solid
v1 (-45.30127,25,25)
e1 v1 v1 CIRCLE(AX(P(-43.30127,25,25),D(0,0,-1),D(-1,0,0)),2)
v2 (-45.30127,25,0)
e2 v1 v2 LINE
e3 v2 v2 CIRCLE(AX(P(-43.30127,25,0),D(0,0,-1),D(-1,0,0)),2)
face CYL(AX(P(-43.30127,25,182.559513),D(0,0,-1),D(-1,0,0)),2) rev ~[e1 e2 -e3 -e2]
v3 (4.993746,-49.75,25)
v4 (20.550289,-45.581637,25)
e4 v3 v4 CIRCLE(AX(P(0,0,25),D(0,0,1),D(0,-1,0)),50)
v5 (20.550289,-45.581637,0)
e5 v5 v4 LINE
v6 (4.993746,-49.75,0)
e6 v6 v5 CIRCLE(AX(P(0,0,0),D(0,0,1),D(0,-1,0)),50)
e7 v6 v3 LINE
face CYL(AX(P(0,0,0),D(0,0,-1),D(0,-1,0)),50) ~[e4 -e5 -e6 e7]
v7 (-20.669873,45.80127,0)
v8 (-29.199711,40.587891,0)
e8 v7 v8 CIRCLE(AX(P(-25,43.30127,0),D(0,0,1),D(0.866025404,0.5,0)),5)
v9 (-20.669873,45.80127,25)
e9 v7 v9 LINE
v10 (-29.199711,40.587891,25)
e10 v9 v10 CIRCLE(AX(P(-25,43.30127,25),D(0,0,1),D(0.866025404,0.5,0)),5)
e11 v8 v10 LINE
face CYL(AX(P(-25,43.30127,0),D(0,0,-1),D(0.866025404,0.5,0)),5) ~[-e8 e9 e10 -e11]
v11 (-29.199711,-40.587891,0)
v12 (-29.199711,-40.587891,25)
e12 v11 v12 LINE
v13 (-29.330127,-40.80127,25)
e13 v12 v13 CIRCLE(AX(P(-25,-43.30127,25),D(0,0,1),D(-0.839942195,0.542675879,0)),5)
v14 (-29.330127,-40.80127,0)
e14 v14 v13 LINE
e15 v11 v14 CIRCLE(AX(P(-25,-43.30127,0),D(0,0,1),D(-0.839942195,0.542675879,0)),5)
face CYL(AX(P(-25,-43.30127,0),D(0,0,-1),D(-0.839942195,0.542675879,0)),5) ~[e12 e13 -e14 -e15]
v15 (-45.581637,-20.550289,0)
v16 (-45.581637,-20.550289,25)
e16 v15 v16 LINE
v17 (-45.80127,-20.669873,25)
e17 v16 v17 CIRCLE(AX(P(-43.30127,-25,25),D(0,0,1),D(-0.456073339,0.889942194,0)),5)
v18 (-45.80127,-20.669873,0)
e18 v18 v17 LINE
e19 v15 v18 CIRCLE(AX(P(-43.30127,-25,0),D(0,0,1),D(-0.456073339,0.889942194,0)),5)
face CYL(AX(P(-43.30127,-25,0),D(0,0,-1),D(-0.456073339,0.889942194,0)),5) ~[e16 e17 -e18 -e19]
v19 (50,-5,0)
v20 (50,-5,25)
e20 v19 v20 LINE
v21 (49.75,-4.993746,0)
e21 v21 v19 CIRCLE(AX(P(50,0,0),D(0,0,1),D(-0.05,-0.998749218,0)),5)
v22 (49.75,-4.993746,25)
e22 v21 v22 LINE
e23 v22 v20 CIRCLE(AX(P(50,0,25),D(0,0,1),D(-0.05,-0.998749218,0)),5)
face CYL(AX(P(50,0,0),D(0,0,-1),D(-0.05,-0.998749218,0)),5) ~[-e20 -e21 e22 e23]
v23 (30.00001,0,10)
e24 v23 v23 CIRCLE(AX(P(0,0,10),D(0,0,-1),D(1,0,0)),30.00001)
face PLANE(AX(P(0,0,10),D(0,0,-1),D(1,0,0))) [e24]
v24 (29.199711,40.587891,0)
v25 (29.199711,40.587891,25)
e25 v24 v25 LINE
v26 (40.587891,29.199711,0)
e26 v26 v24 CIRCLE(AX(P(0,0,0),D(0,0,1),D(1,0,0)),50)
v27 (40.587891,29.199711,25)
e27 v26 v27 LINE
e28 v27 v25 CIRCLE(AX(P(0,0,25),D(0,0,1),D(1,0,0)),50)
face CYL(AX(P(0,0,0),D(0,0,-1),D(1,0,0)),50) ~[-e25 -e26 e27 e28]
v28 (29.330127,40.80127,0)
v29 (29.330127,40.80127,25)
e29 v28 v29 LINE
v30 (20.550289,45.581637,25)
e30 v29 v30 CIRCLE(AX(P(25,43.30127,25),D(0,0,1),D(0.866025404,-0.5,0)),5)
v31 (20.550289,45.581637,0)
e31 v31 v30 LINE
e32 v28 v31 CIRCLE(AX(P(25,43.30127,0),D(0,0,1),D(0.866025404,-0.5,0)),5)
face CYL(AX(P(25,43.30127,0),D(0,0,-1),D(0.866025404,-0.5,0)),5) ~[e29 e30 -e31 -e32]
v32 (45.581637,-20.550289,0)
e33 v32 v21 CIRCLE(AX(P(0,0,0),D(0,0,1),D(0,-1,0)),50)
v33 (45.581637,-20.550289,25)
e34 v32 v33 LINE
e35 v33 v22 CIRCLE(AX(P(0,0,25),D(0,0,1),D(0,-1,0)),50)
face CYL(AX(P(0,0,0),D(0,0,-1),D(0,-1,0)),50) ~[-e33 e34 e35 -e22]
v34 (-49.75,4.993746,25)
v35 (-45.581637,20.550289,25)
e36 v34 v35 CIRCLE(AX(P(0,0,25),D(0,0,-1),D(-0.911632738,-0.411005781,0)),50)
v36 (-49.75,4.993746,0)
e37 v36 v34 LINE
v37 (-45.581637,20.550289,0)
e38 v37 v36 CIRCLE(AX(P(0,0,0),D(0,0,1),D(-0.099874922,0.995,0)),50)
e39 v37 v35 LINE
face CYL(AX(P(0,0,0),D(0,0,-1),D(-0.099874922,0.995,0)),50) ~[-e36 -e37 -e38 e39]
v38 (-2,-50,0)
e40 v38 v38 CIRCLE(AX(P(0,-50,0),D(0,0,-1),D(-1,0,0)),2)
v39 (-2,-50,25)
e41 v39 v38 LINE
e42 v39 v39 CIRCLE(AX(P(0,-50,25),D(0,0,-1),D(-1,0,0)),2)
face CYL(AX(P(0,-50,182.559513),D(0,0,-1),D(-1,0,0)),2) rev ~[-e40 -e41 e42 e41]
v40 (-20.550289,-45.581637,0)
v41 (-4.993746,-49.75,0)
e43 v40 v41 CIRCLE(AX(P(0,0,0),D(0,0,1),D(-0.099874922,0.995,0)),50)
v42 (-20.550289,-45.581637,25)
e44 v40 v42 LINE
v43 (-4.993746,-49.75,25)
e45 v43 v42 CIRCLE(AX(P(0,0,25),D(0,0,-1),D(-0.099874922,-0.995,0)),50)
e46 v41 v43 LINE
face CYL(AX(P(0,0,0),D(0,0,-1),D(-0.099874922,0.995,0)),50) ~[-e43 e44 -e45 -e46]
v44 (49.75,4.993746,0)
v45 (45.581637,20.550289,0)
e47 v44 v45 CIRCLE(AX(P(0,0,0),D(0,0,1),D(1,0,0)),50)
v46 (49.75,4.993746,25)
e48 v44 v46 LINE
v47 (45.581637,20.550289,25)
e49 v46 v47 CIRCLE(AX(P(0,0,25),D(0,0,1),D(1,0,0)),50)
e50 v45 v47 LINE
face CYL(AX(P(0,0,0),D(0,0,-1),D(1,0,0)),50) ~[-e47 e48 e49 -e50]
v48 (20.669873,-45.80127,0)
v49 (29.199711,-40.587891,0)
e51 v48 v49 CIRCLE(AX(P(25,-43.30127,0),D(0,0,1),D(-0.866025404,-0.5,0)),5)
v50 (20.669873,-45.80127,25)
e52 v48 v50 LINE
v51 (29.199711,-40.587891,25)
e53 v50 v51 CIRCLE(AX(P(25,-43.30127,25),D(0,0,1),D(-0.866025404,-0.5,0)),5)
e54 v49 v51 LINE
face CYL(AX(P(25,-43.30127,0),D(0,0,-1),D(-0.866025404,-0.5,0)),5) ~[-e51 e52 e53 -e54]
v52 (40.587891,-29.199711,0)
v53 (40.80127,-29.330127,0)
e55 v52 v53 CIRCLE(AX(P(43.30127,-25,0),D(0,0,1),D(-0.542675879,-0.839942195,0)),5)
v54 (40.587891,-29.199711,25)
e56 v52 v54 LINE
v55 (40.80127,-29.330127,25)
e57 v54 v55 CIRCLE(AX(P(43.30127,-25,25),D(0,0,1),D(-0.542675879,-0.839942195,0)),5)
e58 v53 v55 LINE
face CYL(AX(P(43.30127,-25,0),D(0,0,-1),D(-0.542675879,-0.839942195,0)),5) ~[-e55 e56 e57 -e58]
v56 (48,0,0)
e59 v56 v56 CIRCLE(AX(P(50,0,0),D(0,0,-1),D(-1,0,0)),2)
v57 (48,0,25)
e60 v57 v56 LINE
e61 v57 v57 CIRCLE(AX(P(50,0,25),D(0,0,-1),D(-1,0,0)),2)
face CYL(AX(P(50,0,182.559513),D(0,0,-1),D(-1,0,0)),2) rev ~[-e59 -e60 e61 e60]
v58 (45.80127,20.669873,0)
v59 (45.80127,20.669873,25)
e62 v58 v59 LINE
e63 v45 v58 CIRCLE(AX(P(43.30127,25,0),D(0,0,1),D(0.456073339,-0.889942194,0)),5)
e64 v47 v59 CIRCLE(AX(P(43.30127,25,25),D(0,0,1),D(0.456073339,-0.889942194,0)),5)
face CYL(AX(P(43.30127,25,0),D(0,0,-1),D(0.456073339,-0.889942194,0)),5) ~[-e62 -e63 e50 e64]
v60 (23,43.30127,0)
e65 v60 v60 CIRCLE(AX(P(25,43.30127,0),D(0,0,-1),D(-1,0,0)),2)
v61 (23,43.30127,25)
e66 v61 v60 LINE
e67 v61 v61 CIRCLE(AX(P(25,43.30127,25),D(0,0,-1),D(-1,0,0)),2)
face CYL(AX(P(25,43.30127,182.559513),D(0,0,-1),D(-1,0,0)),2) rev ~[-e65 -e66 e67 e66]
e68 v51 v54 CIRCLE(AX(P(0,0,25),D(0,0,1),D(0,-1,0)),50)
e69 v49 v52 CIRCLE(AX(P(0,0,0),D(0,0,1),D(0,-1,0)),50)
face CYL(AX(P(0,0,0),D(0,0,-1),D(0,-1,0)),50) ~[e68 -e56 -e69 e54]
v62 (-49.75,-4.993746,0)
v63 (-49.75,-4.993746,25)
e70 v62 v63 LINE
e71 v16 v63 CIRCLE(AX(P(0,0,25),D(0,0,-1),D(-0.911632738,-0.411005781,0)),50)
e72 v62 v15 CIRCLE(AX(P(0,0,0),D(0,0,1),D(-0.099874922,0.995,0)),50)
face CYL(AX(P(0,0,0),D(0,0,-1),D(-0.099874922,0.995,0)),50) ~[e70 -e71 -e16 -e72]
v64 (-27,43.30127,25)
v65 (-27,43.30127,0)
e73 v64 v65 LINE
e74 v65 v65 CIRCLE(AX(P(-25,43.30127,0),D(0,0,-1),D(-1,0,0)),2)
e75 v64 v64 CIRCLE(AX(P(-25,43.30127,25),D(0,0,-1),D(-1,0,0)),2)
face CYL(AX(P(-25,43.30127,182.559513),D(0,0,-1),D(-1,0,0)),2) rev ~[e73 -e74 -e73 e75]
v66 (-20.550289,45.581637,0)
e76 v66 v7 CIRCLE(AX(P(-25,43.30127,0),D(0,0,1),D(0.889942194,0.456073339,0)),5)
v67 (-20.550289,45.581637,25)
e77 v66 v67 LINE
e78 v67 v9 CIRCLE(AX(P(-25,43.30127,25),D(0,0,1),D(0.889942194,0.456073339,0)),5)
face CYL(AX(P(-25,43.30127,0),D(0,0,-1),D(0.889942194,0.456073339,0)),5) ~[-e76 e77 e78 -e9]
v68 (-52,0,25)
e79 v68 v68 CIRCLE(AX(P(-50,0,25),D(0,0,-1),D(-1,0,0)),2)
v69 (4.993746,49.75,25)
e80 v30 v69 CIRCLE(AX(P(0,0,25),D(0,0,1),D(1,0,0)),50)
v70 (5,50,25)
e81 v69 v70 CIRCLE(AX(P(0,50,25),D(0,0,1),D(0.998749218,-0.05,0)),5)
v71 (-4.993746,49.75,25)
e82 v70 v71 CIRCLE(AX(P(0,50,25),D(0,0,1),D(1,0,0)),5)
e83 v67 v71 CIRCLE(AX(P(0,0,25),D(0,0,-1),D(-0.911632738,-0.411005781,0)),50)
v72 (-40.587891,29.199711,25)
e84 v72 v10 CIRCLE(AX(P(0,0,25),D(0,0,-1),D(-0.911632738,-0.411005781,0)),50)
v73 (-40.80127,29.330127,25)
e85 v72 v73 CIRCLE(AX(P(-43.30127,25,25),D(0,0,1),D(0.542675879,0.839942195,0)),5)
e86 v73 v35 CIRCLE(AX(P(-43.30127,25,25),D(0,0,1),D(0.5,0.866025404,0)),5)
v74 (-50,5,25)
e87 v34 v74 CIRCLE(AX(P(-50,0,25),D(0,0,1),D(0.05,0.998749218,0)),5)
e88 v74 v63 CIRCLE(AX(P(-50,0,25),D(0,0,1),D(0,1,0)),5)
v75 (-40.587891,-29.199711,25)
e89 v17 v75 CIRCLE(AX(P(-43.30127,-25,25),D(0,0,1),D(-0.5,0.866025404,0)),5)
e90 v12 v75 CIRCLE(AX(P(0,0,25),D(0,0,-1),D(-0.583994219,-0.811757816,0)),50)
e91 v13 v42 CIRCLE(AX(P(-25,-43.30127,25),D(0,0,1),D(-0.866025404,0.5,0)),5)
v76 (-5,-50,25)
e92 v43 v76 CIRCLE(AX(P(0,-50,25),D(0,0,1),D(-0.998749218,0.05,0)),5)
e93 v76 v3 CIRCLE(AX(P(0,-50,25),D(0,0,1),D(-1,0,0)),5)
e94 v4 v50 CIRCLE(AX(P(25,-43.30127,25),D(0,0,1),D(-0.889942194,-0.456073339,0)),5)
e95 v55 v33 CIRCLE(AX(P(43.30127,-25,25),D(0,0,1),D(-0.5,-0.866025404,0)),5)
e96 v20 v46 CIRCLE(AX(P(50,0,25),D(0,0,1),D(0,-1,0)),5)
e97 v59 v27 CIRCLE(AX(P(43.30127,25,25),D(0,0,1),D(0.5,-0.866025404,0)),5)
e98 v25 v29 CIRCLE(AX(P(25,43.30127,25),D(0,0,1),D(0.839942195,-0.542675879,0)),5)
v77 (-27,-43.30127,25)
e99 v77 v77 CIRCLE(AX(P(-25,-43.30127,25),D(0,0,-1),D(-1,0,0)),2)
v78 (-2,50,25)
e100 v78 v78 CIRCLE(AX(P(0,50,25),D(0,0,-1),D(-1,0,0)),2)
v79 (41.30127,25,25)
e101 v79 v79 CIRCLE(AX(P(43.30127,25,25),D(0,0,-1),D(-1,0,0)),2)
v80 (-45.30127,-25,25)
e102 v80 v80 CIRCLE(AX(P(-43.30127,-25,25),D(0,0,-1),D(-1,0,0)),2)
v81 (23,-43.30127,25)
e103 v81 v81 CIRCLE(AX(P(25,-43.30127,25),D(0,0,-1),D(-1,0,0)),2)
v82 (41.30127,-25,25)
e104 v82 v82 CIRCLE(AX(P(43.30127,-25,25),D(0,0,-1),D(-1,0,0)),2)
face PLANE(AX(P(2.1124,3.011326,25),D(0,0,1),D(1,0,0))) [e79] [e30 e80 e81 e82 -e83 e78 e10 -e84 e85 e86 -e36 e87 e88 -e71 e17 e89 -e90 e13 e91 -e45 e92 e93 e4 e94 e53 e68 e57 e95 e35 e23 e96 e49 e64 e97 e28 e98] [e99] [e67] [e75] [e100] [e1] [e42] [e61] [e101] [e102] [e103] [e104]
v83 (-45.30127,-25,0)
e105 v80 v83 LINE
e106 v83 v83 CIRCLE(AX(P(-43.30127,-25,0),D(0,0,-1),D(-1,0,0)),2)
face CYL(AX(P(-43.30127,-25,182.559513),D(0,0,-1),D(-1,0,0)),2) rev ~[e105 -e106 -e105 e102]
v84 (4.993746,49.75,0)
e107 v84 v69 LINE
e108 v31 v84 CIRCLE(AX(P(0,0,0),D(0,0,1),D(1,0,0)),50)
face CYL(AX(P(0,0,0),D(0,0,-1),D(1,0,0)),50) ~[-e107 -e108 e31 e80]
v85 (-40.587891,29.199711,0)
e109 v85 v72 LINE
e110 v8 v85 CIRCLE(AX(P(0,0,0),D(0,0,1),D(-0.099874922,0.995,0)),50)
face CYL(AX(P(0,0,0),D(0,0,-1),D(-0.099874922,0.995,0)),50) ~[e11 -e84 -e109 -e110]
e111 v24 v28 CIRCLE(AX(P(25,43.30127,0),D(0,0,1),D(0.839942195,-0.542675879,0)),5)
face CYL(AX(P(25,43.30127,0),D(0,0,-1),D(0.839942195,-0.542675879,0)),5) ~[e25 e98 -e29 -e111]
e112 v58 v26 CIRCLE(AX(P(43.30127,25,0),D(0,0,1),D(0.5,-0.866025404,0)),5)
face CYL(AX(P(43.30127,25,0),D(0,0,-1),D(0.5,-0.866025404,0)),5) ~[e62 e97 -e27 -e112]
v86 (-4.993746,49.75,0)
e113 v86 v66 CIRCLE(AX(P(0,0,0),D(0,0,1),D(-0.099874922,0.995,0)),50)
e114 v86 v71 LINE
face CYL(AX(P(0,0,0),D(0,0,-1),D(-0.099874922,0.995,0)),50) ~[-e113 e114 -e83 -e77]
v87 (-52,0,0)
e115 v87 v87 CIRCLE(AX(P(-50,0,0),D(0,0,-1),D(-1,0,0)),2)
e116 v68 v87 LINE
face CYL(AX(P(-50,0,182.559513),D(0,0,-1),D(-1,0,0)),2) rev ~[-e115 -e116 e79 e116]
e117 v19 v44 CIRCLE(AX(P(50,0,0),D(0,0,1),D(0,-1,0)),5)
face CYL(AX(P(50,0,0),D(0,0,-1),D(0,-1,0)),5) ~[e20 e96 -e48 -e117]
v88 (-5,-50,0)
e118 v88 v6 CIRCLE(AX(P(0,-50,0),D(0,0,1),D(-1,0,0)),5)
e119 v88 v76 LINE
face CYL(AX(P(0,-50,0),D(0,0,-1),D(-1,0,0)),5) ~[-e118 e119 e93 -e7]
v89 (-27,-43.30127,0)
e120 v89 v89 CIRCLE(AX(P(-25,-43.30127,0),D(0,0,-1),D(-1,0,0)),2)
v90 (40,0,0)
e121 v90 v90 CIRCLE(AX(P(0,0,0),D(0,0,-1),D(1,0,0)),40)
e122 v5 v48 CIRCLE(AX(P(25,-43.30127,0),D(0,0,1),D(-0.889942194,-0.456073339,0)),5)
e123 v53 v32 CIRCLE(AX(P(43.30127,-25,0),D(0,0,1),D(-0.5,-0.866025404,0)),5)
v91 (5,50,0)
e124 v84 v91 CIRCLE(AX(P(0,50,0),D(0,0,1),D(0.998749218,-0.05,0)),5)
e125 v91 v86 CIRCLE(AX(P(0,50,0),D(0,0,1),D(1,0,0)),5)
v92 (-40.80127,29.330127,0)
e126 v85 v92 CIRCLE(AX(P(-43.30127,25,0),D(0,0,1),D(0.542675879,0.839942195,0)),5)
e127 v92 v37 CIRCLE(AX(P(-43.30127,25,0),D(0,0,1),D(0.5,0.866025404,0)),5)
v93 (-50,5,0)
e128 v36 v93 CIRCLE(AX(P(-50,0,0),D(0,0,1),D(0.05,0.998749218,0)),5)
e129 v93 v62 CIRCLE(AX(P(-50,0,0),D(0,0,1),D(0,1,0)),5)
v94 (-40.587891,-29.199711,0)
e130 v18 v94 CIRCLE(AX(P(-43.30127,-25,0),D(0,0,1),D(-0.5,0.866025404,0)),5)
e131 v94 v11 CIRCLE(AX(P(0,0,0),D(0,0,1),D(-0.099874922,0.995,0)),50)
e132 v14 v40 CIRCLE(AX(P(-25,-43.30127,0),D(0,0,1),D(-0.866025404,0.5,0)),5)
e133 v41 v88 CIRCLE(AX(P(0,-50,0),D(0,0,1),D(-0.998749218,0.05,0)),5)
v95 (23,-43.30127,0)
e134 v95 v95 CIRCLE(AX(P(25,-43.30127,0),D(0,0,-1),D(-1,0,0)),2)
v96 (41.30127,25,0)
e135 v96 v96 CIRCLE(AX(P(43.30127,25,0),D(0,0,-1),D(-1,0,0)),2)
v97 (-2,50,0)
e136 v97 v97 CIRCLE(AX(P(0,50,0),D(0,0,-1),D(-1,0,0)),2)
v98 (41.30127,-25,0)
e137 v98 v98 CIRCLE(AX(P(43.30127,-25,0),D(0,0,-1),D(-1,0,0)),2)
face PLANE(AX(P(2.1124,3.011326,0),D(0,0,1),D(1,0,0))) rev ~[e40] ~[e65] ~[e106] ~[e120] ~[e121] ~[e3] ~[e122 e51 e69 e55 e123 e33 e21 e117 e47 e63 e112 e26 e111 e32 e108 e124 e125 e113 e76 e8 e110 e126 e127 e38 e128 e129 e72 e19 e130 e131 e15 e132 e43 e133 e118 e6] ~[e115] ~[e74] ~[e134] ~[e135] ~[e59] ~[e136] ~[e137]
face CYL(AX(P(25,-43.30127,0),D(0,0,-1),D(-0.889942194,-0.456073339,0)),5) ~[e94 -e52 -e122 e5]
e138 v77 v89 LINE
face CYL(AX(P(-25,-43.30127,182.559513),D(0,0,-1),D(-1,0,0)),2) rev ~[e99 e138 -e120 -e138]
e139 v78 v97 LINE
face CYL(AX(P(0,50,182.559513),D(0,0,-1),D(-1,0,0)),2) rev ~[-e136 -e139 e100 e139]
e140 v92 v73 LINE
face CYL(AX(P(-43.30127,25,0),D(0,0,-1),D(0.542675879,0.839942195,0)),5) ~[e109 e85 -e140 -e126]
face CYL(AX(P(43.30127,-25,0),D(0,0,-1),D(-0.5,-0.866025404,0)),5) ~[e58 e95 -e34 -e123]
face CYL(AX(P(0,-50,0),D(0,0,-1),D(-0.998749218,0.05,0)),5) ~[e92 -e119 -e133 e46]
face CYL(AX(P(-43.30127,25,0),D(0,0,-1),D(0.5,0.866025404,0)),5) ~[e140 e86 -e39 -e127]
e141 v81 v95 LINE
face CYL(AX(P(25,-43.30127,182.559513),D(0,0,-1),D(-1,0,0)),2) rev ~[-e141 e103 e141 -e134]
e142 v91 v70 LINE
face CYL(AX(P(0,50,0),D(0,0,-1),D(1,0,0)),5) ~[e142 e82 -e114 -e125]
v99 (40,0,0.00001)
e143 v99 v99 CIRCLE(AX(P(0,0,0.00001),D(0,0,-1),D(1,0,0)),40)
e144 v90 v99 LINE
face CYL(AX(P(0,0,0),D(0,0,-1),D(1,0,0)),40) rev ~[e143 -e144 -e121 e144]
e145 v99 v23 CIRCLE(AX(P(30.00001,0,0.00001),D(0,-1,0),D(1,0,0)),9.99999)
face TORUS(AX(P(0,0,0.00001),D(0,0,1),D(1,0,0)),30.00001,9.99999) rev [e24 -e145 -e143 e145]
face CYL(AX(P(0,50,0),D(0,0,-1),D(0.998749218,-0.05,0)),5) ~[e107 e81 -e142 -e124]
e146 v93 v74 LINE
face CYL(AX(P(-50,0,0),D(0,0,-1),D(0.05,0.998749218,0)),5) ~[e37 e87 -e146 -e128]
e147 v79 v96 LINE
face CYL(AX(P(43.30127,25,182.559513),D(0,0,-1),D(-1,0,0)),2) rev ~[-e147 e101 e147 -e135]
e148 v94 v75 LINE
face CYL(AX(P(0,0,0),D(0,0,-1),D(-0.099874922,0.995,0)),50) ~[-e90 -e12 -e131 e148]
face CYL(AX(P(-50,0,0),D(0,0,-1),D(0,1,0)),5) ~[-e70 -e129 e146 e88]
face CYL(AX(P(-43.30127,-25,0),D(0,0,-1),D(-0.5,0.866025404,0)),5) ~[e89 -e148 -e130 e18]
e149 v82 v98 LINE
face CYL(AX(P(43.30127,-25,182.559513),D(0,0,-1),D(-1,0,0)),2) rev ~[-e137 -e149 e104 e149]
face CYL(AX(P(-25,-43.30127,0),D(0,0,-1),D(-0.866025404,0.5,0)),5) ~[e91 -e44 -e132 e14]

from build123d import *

# Parameters (mm, degrees)
F1_DEPTH = 25
F2_COUNT = 12
F3_R     = 40
F4_DEPTH = 10
F5_R     = 9.99999
F7_D     = 4


# Not quite as in the source:
# - a fillet or chamfer is up to 0.001 mm smaller than in the source, because OpenCascade refuses the exact size


with BuildPart() as f1:
    # F0 (on Top) → F1 (new body)
    with BuildSketch(Plane.XY):
        with BuildLine():
            ThreePointArc((-4.9937460889, 49.75), (-33.5433502766, -37.0788841825), (50, 0))
            ThreePointArc((50, 0), (37.0788841825, 33.5433502766), (4.9937460889, 49.75))
            ThreePointArc((4.9937460889, 49.75), (0, 45), (-4.9937460889, 49.75))
        make_face()
        with BuildLine():
            ThreePointArc((-4.9937460889, 49.75), (0, 45), (4.9937460889, 49.75))
            ThreePointArc((4.9937460889, 49.75), (0, 50), (-4.9937460889, 49.75))
        make_face()
        with BuildLine():
            ThreePointArc((-4.9937460889, 49.75), (0, 50), (4.9937460889, 49.75))
            ThreePointArc((4.9937460889, 49.75), (4.9984362777, 49.8749608947), (5, 50))
            ThreePointArc((5, 50), (-0.1250391053, 54.9984362777), (-4.9937460889, 49.75))
        make_face()
    extrude(amount=F1_DEPTH)

    # F2: F1 ×12 about axis
    f2_axis = Axis((0, 0, 0), (0, 0, -1))


with BuildPart() as f1_1:
    add(f1.part)
    for i in range(1, F2_COUNT):
        add(f1.part.rotate(f2_axis, i * 360 / F2_COUNT))

    # F3 (on face) → F4 (cut)
    with BuildSketch(Plane(origin=(0, 0, 0), x_dir=(1, 0, 0), z_dir=(0, 0, -1))):
        Circle(F3_R)
    extrude(amount=-F4_DEPTH, mode=Mode.SUBTRACT)

    # F5 (radius 10 in the source; OpenCascade refuses exactly that, so slightly less here)
    f5_edges = [f1_1.edges().sort_by_distance(p)[0] for p in [
        (-40, 0, 10),
    ]]
    fillet(f5_edges, radius=F5_R)

    # F7 (through all)
    with Locations(Plane.XY.offset(25)):
        with Locations((25, 43.3012701892), (43.3012701892, 25), (50, 0), (43.3012701892, -25), (25, -43.3012701892), (0, -50), (-25, -43.3012701892), (-43.3012701892, -25), (-50, 0), (-43.3012701892, 25), (-25, 43.3012701892), (0, 50)):
            Hole(F7_D / 2)


solid = f1_1.part
